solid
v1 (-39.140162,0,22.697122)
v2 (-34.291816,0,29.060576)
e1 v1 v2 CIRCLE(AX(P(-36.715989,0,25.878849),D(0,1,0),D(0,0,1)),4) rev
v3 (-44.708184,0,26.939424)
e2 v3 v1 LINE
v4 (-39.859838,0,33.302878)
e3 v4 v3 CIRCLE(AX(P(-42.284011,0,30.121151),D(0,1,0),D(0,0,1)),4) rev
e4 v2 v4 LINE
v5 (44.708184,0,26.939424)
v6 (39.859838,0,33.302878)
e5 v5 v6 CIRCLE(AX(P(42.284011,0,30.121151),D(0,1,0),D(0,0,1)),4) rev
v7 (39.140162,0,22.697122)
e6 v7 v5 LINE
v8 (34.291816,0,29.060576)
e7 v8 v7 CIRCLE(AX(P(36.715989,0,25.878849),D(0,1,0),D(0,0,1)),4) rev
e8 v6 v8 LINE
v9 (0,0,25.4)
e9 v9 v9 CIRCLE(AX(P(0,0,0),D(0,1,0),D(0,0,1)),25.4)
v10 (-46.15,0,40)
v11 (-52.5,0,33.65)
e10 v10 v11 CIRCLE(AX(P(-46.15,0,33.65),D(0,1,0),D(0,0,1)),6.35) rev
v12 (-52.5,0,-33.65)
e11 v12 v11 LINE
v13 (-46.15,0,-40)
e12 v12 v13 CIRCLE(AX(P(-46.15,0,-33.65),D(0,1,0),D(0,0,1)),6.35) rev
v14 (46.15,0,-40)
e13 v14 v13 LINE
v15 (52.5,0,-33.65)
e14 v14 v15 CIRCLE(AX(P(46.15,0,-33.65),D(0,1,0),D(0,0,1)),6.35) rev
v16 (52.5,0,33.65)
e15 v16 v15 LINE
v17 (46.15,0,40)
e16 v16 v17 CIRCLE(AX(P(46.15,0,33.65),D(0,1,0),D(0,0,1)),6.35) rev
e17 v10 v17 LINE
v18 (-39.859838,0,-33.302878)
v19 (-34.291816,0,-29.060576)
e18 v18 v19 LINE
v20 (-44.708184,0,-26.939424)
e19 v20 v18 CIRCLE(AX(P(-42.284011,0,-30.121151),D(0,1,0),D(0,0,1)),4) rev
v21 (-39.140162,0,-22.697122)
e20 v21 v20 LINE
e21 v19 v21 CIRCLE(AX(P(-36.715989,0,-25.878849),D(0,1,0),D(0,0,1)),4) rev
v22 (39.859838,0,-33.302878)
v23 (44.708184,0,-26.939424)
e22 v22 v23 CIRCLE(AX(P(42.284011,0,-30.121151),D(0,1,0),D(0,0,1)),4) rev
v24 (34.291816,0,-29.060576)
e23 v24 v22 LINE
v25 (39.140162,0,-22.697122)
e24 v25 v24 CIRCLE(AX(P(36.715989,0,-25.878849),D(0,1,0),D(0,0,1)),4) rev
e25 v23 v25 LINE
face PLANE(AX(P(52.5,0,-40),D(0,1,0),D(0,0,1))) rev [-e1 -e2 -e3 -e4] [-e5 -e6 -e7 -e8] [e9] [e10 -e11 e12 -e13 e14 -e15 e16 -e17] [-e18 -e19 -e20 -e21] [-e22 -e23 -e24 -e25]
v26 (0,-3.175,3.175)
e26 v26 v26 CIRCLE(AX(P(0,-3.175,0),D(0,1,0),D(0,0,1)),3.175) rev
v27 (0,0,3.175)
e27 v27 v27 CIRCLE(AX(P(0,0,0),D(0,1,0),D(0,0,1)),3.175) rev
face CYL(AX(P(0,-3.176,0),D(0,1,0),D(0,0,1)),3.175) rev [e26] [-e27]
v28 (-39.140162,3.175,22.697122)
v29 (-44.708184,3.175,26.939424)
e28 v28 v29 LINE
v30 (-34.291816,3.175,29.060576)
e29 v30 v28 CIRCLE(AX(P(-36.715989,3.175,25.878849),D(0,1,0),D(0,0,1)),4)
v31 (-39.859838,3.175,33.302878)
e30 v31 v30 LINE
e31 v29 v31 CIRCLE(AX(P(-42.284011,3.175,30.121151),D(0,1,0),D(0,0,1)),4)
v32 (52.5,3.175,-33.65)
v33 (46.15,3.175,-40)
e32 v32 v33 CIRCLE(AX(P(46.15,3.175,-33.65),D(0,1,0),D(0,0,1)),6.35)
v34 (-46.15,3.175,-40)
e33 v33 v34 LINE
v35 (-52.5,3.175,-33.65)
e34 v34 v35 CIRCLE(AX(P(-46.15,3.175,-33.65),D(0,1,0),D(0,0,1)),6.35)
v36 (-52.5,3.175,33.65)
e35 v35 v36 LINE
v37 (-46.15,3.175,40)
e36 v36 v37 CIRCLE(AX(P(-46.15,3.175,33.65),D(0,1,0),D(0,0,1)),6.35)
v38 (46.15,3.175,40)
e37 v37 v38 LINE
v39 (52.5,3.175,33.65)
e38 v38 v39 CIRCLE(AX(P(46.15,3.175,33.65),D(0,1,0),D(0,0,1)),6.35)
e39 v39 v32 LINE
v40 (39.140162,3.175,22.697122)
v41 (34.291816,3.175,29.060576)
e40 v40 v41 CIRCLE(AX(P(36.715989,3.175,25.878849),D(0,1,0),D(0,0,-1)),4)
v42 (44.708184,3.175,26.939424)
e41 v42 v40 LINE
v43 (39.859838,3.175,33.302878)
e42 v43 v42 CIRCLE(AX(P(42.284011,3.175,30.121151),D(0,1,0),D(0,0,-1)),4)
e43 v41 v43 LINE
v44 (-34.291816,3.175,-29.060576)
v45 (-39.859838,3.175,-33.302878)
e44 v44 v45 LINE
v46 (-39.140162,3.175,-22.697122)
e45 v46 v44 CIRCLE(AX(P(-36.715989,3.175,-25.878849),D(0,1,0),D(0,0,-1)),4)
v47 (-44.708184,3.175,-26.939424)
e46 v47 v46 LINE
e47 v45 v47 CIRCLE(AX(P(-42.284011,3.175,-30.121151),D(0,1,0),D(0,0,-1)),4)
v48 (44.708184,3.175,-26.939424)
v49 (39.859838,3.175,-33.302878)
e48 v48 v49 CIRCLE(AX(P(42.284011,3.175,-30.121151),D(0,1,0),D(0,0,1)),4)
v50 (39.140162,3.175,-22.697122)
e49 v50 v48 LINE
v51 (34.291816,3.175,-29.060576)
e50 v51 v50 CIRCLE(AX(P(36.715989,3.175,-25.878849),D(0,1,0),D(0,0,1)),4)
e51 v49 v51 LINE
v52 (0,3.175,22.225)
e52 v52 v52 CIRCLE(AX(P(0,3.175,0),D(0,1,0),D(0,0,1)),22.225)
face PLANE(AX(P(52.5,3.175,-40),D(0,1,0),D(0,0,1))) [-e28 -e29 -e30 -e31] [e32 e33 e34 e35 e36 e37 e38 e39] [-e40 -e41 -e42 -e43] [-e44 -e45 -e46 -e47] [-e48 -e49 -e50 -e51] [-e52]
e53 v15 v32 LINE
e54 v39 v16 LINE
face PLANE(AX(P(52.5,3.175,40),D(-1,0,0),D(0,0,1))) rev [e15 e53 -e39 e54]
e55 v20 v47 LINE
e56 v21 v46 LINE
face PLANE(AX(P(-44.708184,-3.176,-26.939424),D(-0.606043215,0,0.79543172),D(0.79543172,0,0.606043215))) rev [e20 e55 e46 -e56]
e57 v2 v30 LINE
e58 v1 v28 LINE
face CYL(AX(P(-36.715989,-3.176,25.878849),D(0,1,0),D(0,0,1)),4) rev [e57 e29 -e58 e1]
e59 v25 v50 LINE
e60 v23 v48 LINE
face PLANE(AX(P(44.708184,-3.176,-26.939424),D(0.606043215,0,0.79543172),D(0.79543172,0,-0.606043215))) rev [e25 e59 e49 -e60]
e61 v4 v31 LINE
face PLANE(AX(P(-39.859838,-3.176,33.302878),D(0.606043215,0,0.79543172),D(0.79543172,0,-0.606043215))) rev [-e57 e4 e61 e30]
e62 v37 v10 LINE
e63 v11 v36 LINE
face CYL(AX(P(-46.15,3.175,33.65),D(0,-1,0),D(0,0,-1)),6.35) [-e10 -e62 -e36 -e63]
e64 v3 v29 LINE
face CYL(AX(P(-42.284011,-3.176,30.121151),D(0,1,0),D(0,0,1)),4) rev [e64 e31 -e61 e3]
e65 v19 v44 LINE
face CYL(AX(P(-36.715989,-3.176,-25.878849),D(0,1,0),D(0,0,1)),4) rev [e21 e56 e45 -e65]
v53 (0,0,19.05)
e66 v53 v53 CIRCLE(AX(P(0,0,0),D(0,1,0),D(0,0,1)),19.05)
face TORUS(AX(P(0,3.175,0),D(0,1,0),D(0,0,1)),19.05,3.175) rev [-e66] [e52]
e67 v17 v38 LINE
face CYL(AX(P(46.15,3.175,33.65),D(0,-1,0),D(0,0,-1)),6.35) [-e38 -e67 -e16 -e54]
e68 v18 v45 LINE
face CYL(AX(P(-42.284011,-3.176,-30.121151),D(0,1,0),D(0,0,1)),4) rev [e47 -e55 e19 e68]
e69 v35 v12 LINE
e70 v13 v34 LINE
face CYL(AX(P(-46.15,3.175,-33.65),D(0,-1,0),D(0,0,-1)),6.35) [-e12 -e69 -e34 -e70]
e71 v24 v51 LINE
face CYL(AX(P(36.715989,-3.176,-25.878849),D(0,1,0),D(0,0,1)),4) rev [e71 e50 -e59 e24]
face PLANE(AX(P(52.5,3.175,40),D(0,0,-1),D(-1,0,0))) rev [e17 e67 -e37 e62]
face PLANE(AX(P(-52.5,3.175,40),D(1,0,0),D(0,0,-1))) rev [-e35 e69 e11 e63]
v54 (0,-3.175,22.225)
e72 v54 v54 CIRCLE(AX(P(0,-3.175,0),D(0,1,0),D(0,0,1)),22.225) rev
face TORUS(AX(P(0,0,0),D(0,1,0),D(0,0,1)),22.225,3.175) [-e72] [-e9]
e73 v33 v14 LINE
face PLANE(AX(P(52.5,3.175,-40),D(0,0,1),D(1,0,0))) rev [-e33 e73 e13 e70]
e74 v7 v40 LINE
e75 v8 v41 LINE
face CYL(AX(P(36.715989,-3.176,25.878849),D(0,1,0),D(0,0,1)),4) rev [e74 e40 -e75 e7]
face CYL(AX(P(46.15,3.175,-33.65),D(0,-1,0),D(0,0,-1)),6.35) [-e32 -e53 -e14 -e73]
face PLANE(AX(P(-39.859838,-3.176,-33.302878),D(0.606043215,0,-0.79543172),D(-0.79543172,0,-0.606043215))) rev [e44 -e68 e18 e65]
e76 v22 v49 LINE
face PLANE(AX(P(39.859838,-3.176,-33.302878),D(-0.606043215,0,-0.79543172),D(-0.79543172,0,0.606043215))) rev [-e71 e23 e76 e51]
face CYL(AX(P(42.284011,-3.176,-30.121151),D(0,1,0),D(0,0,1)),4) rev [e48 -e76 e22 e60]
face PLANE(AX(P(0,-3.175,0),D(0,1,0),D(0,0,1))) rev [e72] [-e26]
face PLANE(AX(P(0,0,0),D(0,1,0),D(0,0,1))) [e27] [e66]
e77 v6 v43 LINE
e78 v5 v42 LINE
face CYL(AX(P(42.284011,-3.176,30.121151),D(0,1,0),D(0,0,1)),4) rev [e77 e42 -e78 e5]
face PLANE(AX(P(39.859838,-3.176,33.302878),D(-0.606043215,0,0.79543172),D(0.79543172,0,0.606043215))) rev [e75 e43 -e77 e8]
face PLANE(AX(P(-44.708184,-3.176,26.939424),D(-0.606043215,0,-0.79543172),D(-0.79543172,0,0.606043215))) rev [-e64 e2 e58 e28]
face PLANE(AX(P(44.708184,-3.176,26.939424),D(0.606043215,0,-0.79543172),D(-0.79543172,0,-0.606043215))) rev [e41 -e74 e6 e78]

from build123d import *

# Parameters (mm, degrees)
SKETCH12_W          = 105
SKETCH12_H          = 80
BOSS_EXTRUDE6_DEPTH = 3.175
SKETCH15_R          = 25.4
BOSS_EXTRUDE7_DEPTH = 6.35
SKETCH16_R          = 22.225
CUT_EXTRUDE3_DEPTH  = 3.175
CUT_EXTRUDE2_REACH  = 68.307
SKETCH14_R          = 3.175
FILLET6_R           = 6.35
FILLET7_R           = 3.175


with BuildPart() as part:
    # Sketch12 → Boss-Extrude6 (new body)
    with BuildSketch(Plane(origin=(0, 0, 0), x_dir=(-1, 0, 0), z_dir=(0, 1, 0))):
        Rectangle(SKETCH12_W, SKETCH12_H)
    extrude(amount=BOSS_EXTRUDE6_DEPTH)

    # Sketch15 → Boss-Extrude7 (add)
    with BuildSketch(Plane(origin=(0, 3.175, 0), x_dir=(1, 0, 0), z_dir=(0, 1, 0))):
        with Locations(Location((0, 0, 0), (0, 0, 270))):
            Circle(SKETCH15_R)
    extrude(amount=-BOSS_EXTRUDE7_DEPTH)

    # Sketch16 → Cut-Extrude3 (cut)
    with BuildSketch(Plane(origin=(0, 3.175, 0), x_dir=(1, 0, 0), z_dir=(0, 1, 0))):
        with Locations(Location((0, 0, 0), (0, 0, 270))):
            Circle(SKETCH16_R)
    extrude(amount=-CUT_EXTRUDE3_DEPTH, mode=Mode.SUBTRACT)

    # Sketch14 → Cut-Extrude2 (cut, up to next)
    with BuildSketch(Plane(origin=(0, 3.175, 0), x_dir=(-1, 0, 0), z_dir=(0, 1, 0)), mode=Mode.PRIVATE) as cut_extrude2_sk1:
        with Locations(Location((0, 0, 0), (0, 0, 90))):
            Circle(SKETCH14_R)
    cut_extrude2_tool1 = extrude(cut_extrude2_sk1.sketch, amount=-CUT_EXTRUDE2_REACH, mode=Mode.PRIVATE) & part.part
    # Sketch14 → Cut-Extrude2 (cut, up to next)
    with BuildSketch(Plane(origin=(0, 3.175, 0), x_dir=(-1, 0, 0), z_dir=(0, 1, 0)), mode=Mode.PRIVATE) as cut_extrude2_sk2:
        with BuildLine():
            Line((44.708183881, 26.939424373), (39.140161841, 22.697121866))
            ThreePointArc((39.140161841, 22.697121866), (33.5342621, 23.454675886), (34.291816119, 29.060575627))
            Line((34.291816119, 29.060575627), (39.859838159, 33.302878134))
            ThreePointArc((39.859838159, 33.302878134), (45.4657379, 32.545324114), (44.708183881, 26.939424373))
        make_face()
    cut_extrude2_tool2 = extrude(cut_extrude2_sk2.sketch, amount=-CUT_EXTRUDE2_REACH, mode=Mode.PRIVATE) & part.part
    # Sketch14 → Cut-Extrude2 (cut, up to next)
    with BuildSketch(Plane(origin=(0, 3.175, 0), x_dir=(-1, 0, 0), z_dir=(0, 1, 0)), mode=Mode.PRIVATE) as cut_extrude2_sk3:
        with BuildLine():
            Line((-44.708183881, 26.939424373), (-39.140161841, 22.697121866))
            ThreePointArc((-39.140161841, 22.697121866), (-33.5342621, 23.454675886), (-34.291816119, 29.060575627))
            Line((-34.291816119, 29.060575627), (-39.859838159, 33.302878134))
            ThreePointArc((-39.859838159, 33.302878134), (-45.4657379, 32.545324114), (-44.708183881, 26.939424373))
        make_face()
    cut_extrude2_tool3 = extrude(cut_extrude2_sk3.sketch, amount=-CUT_EXTRUDE2_REACH, mode=Mode.PRIVATE) & part.part
    # Sketch14 → Cut-Extrude2 (cut, up to next)
    with BuildSketch(Plane(origin=(0, 3.175, 0), x_dir=(-1, 0, 0), z_dir=(0, 1, 0)), mode=Mode.PRIVATE) as cut_extrude2_sk4:
        with BuildLine():
            Line((-44.708183881, -26.939424373), (-39.140161841, -22.697121866))
            ThreePointArc((-39.140161841, -22.697121866), (-33.5342621, -23.454675886), (-34.291816119, -29.060575627))
            Line((-34.291816119, -29.060575627), (-39.859838159, -33.302878134))
            ThreePointArc((-39.859838159, -33.302878134), (-45.4657379, -32.545324114), (-44.708183881, -26.939424373))
        make_face()
    cut_extrude2_tool4 = extrude(cut_extrude2_sk4.sketch, amount=-CUT_EXTRUDE2_REACH, mode=Mode.PRIVATE) & part.part
    # Sketch14 → Cut-Extrude2 (cut, up to next)
    with BuildSketch(Plane(origin=(0, 3.175, 0), x_dir=(-1, 0, 0), z_dir=(0, 1, 0)), mode=Mode.PRIVATE) as cut_extrude2_sk5:
        with BuildLine():
            Line((44.708183881, -26.939424373), (39.140161841, -22.697121866))
            ThreePointArc((39.140161841, -22.697121866), (33.5342621, -23.454675886), (34.291816119, -29.060575627))
            Line((34.291816119, -29.060575627), (39.859838159, -33.302878134))
            ThreePointArc((39.859838159, -33.302878134), (45.4657379, -32.545324114), (44.708183881, -26.939424373))
        make_face()
    cut_extrude2_tool5 = extrude(cut_extrude2_sk5.sketch, amount=-CUT_EXTRUDE2_REACH, mode=Mode.PRIVATE) & part.part
    add(cut_extrude2_tool1.solids().sort_by_distance((0, 3.175, 0))[0], mode=Mode.SUBTRACT)
    add(cut_extrude2_tool2.solids().sort_by_distance((-39.5, 3.175, 28))[0], mode=Mode.SUBTRACT)
    add(cut_extrude2_tool3.solids().sort_by_distance((39.5, 3.175, 28))[0], mode=Mode.SUBTRACT)
    add(cut_extrude2_tool4.solids().sort_by_distance((39.5, 3.175, -28))[0], mode=Mode.SUBTRACT)
    add(cut_extrude2_tool5.solids().sort_by_distance((-39.5, 3.175, -28))[0], mode=Mode.SUBTRACT)

    # Fillet6
    fillet6_edges = [part.edges().sort_by_distance(p)[0] for p in [
        (52.5, 1.5875, 40),
        (-52.5, 1.5875, 40),
        (-52.5, 1.5875, -40),
        (52.5, 1.5875, -40),
    ]]
    fillet(fillet6_edges, radius=FILLET6_R)

    # Fillet7
    fillet7_edges = [part.edges().sort_by_distance(p)[0] for p in [
        (0, -3.175, -25.4),
        (0, 0, -22.225),
    ]]
    fillet(fillet7_edges, radius=FILLET7_R - 0.0001)  # a hair under: the kernel refuses the full size


solid = part.part
